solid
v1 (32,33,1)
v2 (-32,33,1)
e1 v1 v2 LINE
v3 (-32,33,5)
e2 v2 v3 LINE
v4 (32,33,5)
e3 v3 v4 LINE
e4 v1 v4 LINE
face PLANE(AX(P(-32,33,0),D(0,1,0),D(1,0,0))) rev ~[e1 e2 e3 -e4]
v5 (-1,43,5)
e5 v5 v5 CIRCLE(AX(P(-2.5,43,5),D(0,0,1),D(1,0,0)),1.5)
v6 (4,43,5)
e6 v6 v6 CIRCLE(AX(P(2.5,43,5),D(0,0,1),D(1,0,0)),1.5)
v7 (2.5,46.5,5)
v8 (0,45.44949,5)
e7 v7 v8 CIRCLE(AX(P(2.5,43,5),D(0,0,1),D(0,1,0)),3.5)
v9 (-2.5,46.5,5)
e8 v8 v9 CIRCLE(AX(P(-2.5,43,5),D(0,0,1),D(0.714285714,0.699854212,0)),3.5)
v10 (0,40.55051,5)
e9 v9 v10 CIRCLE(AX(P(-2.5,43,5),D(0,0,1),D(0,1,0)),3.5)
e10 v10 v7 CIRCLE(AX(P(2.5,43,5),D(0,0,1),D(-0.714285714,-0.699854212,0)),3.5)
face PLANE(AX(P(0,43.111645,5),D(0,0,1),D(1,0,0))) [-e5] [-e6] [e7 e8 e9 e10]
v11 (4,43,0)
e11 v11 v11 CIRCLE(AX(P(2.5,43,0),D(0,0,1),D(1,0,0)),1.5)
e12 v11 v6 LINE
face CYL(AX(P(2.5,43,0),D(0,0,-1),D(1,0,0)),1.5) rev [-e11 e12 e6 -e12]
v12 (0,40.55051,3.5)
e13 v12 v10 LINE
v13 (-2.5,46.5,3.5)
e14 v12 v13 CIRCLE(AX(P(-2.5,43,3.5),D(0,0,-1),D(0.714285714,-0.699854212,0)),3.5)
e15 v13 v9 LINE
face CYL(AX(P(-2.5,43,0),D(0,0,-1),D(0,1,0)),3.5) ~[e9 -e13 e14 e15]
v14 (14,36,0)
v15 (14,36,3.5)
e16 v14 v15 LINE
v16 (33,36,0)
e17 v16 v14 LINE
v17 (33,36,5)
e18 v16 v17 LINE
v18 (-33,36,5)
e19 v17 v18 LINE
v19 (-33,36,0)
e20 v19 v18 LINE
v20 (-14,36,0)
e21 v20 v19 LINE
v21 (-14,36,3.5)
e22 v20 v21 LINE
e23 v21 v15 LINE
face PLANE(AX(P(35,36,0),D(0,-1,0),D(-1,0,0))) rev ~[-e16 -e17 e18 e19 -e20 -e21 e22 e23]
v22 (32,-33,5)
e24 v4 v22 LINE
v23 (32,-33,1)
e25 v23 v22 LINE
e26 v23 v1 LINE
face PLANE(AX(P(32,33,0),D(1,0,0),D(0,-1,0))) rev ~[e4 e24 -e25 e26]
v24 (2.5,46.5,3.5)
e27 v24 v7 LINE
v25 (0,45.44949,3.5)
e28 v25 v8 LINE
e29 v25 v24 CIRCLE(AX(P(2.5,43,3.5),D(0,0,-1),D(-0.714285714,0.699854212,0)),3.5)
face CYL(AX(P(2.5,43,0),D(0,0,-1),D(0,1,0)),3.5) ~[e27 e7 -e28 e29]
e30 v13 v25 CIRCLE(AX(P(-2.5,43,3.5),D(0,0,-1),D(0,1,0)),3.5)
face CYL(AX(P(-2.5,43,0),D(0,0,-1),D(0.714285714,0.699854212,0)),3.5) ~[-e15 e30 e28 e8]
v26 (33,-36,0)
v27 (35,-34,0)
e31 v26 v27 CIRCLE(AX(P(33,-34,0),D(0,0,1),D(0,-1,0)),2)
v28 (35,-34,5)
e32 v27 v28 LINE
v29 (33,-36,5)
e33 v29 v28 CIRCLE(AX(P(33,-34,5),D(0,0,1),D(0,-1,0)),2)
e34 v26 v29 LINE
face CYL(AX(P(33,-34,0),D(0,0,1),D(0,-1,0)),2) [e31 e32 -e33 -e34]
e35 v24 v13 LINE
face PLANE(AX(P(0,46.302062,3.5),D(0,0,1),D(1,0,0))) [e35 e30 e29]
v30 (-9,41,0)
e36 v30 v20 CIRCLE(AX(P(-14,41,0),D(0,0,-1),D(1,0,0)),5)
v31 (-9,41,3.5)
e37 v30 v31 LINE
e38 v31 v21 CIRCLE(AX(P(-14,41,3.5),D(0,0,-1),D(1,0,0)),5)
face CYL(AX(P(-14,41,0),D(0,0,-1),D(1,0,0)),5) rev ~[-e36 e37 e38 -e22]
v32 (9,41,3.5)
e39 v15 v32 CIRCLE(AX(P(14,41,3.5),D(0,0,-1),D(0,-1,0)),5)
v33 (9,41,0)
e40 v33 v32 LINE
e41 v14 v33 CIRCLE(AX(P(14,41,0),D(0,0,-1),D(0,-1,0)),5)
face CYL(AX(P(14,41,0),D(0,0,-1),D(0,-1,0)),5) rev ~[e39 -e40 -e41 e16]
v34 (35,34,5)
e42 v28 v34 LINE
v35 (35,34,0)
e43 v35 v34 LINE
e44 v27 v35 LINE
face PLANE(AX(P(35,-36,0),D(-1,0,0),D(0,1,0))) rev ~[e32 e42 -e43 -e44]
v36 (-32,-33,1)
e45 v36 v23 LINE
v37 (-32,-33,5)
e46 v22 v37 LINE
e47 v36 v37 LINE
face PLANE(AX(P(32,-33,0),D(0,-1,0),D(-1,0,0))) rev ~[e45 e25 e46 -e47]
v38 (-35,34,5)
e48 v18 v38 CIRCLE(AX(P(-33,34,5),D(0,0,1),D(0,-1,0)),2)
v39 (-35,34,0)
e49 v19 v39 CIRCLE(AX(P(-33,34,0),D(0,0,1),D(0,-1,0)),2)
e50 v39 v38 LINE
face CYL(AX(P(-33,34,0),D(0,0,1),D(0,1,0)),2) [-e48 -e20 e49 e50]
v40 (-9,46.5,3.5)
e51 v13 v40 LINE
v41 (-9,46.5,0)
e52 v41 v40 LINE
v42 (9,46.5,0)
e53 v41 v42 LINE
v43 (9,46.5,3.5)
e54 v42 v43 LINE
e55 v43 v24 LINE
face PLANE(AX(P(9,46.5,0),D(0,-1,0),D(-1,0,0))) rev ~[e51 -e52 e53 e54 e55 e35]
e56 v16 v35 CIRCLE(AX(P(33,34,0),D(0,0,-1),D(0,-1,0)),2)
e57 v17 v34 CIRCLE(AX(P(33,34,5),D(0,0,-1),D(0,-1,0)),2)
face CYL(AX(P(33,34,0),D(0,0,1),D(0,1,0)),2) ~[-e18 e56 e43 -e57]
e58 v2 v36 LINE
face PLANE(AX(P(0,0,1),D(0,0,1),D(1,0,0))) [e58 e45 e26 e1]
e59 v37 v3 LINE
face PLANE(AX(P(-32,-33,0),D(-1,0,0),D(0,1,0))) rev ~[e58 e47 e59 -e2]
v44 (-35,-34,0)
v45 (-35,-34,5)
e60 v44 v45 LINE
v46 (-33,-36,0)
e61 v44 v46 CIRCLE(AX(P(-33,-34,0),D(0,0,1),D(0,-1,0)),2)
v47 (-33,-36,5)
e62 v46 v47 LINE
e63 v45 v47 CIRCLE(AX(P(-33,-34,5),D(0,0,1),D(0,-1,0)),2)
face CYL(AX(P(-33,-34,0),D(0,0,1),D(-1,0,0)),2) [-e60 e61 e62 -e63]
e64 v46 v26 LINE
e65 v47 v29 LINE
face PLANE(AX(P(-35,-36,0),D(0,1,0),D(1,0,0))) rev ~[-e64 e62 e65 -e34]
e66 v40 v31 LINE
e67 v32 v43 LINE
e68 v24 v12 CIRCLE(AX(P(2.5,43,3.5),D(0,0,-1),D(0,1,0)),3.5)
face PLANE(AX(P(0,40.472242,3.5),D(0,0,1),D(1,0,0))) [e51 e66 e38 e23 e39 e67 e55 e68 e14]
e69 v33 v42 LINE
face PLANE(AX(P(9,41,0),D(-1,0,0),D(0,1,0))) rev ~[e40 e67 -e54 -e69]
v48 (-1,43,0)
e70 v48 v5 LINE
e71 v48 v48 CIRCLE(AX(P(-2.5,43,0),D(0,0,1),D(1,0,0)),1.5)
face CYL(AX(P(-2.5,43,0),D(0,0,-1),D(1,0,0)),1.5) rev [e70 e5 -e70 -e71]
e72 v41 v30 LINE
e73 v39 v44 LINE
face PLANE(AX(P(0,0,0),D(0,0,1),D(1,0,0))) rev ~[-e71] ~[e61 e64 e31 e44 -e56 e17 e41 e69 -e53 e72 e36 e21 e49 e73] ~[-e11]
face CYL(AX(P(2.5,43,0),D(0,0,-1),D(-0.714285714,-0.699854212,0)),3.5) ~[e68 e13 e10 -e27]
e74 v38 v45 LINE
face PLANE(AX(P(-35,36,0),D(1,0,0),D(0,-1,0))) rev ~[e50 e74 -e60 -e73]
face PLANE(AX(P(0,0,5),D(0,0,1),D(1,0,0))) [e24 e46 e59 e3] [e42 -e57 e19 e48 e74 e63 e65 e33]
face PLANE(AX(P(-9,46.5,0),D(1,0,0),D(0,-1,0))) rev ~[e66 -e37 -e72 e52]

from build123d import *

# Parameters (mm, degrees)
F1_DEPTH = 5
F0_R     = 1.5
F2_DEPTH = 3.5
F3_DEPTH = 1
F4_R     = 2


# Not quite as in the source:
# - a feature names something its author has since deleted; it is built from what else it names


with BuildPart() as f1:
    # F0 (on Top) → F1 (new body)
    with BuildSketch(Plane.XY):
        Polygon((35, 36), (14, 36), (-14, 36), (-35, 36), (-35, -36), (35, -36), (35, -33), (35, 33), align=None)
        Polygon((-32, 14.5), (-32, 33), (32, 33), (32, -2), (32, -12.5), (32, -33), (12.7135775983, -33), (-8, -33), (-32, -33), (-32, -14), (-32, 10.5), align=None, mode=Mode.SUBTRACT)
    extrude(amount=F1_DEPTH)



with BuildPart() as f1b:
    # F0 (on Top) → F1, piece 2 (new body)
    with BuildSketch(Plane.XY):
        with BuildLine():
            ThreePointArc((0, 40.5505102572), (5.7267021942, 41.6441264992), (2.5, 46.5))
            ThreePointArc((2.5, 46.5), (1.1441264992, 46.2267021942), (0, 45.4494897428))
            ThreePointArc((0, 45.4494897428), (-1.1441264992, 46.2267021942), (-2.5, 46.5))
            ThreePointArc((-2.5, 46.5), (-5.7267021942, 41.6441264992), (0, 40.5505102572))
        make_face()
        with Locations((-2.5, 43)):
            Circle(F0_R, mode=Mode.SUBTRACT)
        with Locations((2.5, 43)):
            Circle(F0_R, mode=Mode.SUBTRACT)
    extrude(amount=F1_DEPTH)


with BuildPart() as f1_1:
    add(f1.part)

    add(f1b.part)  # F2 merges F1b
    # F0 (on Top) → F2 (join)
    with BuildSketch(Plane.XY):
        with BuildLine():
            Line((-14, 36), (14, 36))
            ThreePointArc((14, 36), (10.4644660941, 37.4644660941), (9, 41))
            Line((9, 41), (9, 46.5))
            Line((9, 46.5), (2.5, 46.5))
            ThreePointArc((2.5, 46.5), (5.7267021942, 41.6441264992), (0, 40.5505102572))
            ThreePointArc((0, 40.5505102572), (-5.7267021942, 41.6441264992), (-2.5, 46.5))
            Line((-2.5, 46.5), (-9, 46.5))
            Line((-9, 46.5), (-9, 41))
            ThreePointArc((-9, 41), (-10.4644660941, 37.4644660941), (-14, 36))
        make_face()
        with BuildLine():
            ThreePointArc((0, 45.4494897428), (1.1441264992, 46.2267021942), (2.5, 46.5))
            Line((2.5, 46.5), (-2.5, 46.5))
            ThreePointArc((-2.5, 46.5), (-1.1441264992, 46.2267021942), (0, 45.4494897428))
        make_face()
    extrude(amount=F2_DEPTH)

    # F0 (on Top) → F3 (join)
    with BuildSketch(Plane.XY):
        Polygon((32, 33), (-32, 33), (-32, 14.5), (-32, 10.5), (-32, -14), (-32, -33), (-8, -33), (12.7135775983, -33), (32, -33), (32, -12.5), (32, -2), align=None)
    extrude(amount=F3_DEPTH)

    # F4
    f4_edges = [f1_1.edges().sort_by_distance(p)[0] for p in [
        (-35, -36, 2.5),
        (35, -36, 2.5),
        (-35, 36, 2.5),
        (35, 36, 2.5),
    ]]
    fillet(f4_edges, radius=F4_R)


solid = f1_1.part
